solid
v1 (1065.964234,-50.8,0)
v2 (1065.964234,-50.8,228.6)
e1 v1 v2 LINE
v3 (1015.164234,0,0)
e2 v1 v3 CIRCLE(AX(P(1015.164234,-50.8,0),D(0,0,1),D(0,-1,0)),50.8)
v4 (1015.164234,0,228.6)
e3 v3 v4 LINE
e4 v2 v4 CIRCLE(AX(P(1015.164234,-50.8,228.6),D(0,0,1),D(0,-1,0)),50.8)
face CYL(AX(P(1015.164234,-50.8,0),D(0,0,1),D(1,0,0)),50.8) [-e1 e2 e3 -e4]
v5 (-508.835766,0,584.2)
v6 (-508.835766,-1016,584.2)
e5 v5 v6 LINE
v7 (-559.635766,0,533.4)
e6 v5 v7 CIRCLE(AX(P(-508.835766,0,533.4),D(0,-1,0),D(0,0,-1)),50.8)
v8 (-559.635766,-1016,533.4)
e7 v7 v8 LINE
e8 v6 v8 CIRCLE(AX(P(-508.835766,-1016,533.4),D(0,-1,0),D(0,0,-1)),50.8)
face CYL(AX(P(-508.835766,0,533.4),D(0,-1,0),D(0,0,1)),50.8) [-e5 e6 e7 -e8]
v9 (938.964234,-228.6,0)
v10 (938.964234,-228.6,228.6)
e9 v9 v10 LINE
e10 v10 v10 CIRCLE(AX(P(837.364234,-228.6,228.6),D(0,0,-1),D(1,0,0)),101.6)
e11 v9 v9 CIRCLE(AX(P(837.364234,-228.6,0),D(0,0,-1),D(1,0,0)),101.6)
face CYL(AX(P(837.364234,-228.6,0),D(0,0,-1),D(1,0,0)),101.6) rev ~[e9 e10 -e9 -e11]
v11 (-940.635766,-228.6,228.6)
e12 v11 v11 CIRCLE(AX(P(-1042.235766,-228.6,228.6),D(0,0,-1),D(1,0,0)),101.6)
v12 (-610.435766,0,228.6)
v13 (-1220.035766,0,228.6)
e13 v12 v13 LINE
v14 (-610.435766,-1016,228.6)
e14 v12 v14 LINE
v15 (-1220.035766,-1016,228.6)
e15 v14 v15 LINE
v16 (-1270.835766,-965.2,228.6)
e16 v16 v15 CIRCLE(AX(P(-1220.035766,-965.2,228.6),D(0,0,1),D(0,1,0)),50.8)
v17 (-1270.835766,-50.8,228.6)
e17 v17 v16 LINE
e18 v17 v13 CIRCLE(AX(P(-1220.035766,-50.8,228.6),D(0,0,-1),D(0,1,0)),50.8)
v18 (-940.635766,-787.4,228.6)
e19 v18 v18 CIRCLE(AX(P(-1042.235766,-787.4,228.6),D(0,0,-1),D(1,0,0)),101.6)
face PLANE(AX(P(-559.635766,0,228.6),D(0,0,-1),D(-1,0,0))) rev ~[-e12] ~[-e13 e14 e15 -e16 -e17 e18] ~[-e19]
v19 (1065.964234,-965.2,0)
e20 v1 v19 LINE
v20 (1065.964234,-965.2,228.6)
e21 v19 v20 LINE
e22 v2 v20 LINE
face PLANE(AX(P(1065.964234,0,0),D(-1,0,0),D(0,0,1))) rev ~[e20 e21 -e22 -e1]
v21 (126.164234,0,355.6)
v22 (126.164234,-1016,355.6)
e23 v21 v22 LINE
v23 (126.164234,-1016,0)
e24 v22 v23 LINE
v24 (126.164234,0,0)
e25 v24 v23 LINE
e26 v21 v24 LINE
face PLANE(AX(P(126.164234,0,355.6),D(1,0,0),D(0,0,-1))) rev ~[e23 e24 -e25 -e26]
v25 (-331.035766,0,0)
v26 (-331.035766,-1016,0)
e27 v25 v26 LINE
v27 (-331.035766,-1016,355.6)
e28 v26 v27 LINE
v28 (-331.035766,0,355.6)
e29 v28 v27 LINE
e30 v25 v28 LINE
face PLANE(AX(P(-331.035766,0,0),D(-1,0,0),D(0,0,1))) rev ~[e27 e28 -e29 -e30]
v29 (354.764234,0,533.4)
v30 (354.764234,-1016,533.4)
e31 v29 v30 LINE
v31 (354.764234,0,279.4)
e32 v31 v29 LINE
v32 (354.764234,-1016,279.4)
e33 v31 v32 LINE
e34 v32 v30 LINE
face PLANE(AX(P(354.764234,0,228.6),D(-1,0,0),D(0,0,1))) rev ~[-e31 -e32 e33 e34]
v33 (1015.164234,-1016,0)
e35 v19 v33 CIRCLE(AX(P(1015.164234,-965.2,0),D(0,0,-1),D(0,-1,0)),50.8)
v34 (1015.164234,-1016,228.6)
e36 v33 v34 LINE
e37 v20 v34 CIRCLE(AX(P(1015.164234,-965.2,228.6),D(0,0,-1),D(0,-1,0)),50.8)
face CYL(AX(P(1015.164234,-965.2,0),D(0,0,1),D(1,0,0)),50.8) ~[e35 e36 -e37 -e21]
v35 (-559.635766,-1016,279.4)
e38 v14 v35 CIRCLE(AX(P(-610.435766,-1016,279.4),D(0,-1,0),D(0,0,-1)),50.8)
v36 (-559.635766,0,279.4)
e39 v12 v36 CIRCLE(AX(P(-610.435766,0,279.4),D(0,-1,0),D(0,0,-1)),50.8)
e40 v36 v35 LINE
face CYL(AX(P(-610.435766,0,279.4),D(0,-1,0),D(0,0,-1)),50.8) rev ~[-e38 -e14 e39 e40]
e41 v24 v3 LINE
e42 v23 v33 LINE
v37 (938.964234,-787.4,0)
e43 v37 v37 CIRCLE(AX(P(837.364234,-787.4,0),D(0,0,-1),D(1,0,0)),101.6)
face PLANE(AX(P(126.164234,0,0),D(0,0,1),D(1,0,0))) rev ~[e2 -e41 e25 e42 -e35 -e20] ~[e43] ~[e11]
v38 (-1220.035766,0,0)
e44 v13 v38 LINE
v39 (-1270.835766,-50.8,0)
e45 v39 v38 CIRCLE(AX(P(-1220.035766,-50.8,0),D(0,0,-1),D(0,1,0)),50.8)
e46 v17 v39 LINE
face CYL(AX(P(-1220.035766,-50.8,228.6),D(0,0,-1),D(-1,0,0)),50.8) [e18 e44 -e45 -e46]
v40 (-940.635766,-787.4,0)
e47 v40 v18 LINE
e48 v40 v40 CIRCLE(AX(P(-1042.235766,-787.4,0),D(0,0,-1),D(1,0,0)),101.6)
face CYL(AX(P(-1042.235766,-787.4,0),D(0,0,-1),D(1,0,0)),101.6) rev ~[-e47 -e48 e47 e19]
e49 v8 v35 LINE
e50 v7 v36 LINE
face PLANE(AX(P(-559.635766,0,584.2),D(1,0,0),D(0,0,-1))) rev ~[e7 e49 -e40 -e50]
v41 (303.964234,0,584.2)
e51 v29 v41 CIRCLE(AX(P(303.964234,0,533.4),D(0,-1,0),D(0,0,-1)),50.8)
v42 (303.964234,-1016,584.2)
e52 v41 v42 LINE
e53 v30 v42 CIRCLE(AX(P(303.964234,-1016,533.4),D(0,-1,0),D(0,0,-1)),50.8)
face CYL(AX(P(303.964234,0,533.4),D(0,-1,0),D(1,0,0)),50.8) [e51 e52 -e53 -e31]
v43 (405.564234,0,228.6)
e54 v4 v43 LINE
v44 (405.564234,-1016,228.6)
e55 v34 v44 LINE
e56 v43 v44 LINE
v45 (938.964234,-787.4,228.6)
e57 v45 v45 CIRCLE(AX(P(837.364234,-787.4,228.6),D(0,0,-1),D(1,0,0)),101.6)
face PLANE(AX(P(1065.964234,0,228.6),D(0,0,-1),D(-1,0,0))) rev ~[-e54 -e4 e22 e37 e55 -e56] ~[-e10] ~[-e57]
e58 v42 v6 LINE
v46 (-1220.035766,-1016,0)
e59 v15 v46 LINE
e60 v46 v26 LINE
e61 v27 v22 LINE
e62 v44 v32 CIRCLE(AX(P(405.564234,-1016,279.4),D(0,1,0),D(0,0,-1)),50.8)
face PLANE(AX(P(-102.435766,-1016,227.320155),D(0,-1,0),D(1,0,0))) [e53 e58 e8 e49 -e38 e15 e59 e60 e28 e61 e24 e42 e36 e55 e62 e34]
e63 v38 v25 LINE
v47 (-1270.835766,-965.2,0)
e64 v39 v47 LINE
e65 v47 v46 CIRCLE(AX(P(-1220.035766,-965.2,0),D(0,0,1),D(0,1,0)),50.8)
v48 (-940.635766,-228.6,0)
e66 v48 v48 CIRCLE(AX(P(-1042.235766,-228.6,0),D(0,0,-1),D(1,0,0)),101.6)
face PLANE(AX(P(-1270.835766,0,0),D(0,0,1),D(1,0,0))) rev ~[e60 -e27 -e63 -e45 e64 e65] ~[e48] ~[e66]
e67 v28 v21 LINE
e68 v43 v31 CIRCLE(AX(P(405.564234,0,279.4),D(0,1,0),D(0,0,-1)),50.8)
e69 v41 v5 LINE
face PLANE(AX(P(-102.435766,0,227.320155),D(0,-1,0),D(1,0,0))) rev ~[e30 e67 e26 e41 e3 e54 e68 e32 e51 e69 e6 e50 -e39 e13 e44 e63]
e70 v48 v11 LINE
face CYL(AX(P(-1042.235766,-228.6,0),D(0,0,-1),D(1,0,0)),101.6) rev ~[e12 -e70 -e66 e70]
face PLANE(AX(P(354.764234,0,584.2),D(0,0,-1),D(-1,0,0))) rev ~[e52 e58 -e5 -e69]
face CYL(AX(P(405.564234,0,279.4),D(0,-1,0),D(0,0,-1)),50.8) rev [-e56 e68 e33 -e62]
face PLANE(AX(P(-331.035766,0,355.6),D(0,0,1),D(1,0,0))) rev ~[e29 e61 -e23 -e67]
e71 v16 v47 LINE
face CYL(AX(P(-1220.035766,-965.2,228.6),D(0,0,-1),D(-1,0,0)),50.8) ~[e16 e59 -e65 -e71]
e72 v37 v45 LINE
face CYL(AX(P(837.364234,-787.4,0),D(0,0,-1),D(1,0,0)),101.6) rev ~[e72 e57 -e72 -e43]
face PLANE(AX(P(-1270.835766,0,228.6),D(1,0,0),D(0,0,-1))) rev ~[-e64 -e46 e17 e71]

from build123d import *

# Parameters (mm, degrees)
F1_DEPTH = 1016
F2_R     = 50.8
F3_R     = 50.8
F4_R     = 101.6
F5_DEPTH = 228.6


# Not quite as in the source:
# - a feature names something its author has since deleted; it is built from what else it names


with BuildPart() as f1:
    # F0 (on Front) → F1 (new body)
    with BuildSketch(Plane.XZ):
        Polygon((-1270.8357659235, 228.6), (-1270.8357659235, 0), (-331.0357659235, 0), (-331.0357659235, 355.6), (126.1642340765, 355.6), (126.1642340765, 0), (1065.9642340765, 0), (1065.9642340765, 228.6), (354.7642340765, 228.6), (354.7642340765, 584.2), (-559.6357659235, 584.2), (-559.6357659235, 228.6), align=None)
    extrude(amount=F1_DEPTH)

    # F2
    f2_edges = [f1.edges().sort_by_distance(p)[0] for p in [
        (-559.635766, -508, 584.2),
        (354.764234, -508, 584.2),
        (-1270.835766, -1016, 114.3),
        (1065.964234, -1016, 114.3),
        (1065.964234, 0, 114.3),
        (-1270.835766, 0, 114.3),
    ]]
    fillet(f2_edges, radius=F2_R)

    # F3
    f3_edges = [f1.edges().sort_by_distance(p)[0] for p in [
        (354.764234, -508, 228.6),
        (-559.635766, -508, 228.6),
    ]]
    fillet(f3_edges, radius=F3_R)

    # F4 (on face) → F5 (cut)
    with BuildSketch(Plane(origin=(0, 0, 0), x_dir=(1, 0, 0), z_dir=(0, 0, -1))):
        with Locations((837.3642340765, 228.6)):
            Circle(F4_R)
        with Locations((837.3642340765, 787.4)):
            Circle(F4_R)
        with Locations((-1042.2357659235, 228.6)):
            Circle(F4_R)
        with Locations((-1042.2357659235, 787.4)):
            Circle(F4_R)
    extrude(amount=-F5_DEPTH, mode=Mode.SUBTRACT)


solid = f1.part
